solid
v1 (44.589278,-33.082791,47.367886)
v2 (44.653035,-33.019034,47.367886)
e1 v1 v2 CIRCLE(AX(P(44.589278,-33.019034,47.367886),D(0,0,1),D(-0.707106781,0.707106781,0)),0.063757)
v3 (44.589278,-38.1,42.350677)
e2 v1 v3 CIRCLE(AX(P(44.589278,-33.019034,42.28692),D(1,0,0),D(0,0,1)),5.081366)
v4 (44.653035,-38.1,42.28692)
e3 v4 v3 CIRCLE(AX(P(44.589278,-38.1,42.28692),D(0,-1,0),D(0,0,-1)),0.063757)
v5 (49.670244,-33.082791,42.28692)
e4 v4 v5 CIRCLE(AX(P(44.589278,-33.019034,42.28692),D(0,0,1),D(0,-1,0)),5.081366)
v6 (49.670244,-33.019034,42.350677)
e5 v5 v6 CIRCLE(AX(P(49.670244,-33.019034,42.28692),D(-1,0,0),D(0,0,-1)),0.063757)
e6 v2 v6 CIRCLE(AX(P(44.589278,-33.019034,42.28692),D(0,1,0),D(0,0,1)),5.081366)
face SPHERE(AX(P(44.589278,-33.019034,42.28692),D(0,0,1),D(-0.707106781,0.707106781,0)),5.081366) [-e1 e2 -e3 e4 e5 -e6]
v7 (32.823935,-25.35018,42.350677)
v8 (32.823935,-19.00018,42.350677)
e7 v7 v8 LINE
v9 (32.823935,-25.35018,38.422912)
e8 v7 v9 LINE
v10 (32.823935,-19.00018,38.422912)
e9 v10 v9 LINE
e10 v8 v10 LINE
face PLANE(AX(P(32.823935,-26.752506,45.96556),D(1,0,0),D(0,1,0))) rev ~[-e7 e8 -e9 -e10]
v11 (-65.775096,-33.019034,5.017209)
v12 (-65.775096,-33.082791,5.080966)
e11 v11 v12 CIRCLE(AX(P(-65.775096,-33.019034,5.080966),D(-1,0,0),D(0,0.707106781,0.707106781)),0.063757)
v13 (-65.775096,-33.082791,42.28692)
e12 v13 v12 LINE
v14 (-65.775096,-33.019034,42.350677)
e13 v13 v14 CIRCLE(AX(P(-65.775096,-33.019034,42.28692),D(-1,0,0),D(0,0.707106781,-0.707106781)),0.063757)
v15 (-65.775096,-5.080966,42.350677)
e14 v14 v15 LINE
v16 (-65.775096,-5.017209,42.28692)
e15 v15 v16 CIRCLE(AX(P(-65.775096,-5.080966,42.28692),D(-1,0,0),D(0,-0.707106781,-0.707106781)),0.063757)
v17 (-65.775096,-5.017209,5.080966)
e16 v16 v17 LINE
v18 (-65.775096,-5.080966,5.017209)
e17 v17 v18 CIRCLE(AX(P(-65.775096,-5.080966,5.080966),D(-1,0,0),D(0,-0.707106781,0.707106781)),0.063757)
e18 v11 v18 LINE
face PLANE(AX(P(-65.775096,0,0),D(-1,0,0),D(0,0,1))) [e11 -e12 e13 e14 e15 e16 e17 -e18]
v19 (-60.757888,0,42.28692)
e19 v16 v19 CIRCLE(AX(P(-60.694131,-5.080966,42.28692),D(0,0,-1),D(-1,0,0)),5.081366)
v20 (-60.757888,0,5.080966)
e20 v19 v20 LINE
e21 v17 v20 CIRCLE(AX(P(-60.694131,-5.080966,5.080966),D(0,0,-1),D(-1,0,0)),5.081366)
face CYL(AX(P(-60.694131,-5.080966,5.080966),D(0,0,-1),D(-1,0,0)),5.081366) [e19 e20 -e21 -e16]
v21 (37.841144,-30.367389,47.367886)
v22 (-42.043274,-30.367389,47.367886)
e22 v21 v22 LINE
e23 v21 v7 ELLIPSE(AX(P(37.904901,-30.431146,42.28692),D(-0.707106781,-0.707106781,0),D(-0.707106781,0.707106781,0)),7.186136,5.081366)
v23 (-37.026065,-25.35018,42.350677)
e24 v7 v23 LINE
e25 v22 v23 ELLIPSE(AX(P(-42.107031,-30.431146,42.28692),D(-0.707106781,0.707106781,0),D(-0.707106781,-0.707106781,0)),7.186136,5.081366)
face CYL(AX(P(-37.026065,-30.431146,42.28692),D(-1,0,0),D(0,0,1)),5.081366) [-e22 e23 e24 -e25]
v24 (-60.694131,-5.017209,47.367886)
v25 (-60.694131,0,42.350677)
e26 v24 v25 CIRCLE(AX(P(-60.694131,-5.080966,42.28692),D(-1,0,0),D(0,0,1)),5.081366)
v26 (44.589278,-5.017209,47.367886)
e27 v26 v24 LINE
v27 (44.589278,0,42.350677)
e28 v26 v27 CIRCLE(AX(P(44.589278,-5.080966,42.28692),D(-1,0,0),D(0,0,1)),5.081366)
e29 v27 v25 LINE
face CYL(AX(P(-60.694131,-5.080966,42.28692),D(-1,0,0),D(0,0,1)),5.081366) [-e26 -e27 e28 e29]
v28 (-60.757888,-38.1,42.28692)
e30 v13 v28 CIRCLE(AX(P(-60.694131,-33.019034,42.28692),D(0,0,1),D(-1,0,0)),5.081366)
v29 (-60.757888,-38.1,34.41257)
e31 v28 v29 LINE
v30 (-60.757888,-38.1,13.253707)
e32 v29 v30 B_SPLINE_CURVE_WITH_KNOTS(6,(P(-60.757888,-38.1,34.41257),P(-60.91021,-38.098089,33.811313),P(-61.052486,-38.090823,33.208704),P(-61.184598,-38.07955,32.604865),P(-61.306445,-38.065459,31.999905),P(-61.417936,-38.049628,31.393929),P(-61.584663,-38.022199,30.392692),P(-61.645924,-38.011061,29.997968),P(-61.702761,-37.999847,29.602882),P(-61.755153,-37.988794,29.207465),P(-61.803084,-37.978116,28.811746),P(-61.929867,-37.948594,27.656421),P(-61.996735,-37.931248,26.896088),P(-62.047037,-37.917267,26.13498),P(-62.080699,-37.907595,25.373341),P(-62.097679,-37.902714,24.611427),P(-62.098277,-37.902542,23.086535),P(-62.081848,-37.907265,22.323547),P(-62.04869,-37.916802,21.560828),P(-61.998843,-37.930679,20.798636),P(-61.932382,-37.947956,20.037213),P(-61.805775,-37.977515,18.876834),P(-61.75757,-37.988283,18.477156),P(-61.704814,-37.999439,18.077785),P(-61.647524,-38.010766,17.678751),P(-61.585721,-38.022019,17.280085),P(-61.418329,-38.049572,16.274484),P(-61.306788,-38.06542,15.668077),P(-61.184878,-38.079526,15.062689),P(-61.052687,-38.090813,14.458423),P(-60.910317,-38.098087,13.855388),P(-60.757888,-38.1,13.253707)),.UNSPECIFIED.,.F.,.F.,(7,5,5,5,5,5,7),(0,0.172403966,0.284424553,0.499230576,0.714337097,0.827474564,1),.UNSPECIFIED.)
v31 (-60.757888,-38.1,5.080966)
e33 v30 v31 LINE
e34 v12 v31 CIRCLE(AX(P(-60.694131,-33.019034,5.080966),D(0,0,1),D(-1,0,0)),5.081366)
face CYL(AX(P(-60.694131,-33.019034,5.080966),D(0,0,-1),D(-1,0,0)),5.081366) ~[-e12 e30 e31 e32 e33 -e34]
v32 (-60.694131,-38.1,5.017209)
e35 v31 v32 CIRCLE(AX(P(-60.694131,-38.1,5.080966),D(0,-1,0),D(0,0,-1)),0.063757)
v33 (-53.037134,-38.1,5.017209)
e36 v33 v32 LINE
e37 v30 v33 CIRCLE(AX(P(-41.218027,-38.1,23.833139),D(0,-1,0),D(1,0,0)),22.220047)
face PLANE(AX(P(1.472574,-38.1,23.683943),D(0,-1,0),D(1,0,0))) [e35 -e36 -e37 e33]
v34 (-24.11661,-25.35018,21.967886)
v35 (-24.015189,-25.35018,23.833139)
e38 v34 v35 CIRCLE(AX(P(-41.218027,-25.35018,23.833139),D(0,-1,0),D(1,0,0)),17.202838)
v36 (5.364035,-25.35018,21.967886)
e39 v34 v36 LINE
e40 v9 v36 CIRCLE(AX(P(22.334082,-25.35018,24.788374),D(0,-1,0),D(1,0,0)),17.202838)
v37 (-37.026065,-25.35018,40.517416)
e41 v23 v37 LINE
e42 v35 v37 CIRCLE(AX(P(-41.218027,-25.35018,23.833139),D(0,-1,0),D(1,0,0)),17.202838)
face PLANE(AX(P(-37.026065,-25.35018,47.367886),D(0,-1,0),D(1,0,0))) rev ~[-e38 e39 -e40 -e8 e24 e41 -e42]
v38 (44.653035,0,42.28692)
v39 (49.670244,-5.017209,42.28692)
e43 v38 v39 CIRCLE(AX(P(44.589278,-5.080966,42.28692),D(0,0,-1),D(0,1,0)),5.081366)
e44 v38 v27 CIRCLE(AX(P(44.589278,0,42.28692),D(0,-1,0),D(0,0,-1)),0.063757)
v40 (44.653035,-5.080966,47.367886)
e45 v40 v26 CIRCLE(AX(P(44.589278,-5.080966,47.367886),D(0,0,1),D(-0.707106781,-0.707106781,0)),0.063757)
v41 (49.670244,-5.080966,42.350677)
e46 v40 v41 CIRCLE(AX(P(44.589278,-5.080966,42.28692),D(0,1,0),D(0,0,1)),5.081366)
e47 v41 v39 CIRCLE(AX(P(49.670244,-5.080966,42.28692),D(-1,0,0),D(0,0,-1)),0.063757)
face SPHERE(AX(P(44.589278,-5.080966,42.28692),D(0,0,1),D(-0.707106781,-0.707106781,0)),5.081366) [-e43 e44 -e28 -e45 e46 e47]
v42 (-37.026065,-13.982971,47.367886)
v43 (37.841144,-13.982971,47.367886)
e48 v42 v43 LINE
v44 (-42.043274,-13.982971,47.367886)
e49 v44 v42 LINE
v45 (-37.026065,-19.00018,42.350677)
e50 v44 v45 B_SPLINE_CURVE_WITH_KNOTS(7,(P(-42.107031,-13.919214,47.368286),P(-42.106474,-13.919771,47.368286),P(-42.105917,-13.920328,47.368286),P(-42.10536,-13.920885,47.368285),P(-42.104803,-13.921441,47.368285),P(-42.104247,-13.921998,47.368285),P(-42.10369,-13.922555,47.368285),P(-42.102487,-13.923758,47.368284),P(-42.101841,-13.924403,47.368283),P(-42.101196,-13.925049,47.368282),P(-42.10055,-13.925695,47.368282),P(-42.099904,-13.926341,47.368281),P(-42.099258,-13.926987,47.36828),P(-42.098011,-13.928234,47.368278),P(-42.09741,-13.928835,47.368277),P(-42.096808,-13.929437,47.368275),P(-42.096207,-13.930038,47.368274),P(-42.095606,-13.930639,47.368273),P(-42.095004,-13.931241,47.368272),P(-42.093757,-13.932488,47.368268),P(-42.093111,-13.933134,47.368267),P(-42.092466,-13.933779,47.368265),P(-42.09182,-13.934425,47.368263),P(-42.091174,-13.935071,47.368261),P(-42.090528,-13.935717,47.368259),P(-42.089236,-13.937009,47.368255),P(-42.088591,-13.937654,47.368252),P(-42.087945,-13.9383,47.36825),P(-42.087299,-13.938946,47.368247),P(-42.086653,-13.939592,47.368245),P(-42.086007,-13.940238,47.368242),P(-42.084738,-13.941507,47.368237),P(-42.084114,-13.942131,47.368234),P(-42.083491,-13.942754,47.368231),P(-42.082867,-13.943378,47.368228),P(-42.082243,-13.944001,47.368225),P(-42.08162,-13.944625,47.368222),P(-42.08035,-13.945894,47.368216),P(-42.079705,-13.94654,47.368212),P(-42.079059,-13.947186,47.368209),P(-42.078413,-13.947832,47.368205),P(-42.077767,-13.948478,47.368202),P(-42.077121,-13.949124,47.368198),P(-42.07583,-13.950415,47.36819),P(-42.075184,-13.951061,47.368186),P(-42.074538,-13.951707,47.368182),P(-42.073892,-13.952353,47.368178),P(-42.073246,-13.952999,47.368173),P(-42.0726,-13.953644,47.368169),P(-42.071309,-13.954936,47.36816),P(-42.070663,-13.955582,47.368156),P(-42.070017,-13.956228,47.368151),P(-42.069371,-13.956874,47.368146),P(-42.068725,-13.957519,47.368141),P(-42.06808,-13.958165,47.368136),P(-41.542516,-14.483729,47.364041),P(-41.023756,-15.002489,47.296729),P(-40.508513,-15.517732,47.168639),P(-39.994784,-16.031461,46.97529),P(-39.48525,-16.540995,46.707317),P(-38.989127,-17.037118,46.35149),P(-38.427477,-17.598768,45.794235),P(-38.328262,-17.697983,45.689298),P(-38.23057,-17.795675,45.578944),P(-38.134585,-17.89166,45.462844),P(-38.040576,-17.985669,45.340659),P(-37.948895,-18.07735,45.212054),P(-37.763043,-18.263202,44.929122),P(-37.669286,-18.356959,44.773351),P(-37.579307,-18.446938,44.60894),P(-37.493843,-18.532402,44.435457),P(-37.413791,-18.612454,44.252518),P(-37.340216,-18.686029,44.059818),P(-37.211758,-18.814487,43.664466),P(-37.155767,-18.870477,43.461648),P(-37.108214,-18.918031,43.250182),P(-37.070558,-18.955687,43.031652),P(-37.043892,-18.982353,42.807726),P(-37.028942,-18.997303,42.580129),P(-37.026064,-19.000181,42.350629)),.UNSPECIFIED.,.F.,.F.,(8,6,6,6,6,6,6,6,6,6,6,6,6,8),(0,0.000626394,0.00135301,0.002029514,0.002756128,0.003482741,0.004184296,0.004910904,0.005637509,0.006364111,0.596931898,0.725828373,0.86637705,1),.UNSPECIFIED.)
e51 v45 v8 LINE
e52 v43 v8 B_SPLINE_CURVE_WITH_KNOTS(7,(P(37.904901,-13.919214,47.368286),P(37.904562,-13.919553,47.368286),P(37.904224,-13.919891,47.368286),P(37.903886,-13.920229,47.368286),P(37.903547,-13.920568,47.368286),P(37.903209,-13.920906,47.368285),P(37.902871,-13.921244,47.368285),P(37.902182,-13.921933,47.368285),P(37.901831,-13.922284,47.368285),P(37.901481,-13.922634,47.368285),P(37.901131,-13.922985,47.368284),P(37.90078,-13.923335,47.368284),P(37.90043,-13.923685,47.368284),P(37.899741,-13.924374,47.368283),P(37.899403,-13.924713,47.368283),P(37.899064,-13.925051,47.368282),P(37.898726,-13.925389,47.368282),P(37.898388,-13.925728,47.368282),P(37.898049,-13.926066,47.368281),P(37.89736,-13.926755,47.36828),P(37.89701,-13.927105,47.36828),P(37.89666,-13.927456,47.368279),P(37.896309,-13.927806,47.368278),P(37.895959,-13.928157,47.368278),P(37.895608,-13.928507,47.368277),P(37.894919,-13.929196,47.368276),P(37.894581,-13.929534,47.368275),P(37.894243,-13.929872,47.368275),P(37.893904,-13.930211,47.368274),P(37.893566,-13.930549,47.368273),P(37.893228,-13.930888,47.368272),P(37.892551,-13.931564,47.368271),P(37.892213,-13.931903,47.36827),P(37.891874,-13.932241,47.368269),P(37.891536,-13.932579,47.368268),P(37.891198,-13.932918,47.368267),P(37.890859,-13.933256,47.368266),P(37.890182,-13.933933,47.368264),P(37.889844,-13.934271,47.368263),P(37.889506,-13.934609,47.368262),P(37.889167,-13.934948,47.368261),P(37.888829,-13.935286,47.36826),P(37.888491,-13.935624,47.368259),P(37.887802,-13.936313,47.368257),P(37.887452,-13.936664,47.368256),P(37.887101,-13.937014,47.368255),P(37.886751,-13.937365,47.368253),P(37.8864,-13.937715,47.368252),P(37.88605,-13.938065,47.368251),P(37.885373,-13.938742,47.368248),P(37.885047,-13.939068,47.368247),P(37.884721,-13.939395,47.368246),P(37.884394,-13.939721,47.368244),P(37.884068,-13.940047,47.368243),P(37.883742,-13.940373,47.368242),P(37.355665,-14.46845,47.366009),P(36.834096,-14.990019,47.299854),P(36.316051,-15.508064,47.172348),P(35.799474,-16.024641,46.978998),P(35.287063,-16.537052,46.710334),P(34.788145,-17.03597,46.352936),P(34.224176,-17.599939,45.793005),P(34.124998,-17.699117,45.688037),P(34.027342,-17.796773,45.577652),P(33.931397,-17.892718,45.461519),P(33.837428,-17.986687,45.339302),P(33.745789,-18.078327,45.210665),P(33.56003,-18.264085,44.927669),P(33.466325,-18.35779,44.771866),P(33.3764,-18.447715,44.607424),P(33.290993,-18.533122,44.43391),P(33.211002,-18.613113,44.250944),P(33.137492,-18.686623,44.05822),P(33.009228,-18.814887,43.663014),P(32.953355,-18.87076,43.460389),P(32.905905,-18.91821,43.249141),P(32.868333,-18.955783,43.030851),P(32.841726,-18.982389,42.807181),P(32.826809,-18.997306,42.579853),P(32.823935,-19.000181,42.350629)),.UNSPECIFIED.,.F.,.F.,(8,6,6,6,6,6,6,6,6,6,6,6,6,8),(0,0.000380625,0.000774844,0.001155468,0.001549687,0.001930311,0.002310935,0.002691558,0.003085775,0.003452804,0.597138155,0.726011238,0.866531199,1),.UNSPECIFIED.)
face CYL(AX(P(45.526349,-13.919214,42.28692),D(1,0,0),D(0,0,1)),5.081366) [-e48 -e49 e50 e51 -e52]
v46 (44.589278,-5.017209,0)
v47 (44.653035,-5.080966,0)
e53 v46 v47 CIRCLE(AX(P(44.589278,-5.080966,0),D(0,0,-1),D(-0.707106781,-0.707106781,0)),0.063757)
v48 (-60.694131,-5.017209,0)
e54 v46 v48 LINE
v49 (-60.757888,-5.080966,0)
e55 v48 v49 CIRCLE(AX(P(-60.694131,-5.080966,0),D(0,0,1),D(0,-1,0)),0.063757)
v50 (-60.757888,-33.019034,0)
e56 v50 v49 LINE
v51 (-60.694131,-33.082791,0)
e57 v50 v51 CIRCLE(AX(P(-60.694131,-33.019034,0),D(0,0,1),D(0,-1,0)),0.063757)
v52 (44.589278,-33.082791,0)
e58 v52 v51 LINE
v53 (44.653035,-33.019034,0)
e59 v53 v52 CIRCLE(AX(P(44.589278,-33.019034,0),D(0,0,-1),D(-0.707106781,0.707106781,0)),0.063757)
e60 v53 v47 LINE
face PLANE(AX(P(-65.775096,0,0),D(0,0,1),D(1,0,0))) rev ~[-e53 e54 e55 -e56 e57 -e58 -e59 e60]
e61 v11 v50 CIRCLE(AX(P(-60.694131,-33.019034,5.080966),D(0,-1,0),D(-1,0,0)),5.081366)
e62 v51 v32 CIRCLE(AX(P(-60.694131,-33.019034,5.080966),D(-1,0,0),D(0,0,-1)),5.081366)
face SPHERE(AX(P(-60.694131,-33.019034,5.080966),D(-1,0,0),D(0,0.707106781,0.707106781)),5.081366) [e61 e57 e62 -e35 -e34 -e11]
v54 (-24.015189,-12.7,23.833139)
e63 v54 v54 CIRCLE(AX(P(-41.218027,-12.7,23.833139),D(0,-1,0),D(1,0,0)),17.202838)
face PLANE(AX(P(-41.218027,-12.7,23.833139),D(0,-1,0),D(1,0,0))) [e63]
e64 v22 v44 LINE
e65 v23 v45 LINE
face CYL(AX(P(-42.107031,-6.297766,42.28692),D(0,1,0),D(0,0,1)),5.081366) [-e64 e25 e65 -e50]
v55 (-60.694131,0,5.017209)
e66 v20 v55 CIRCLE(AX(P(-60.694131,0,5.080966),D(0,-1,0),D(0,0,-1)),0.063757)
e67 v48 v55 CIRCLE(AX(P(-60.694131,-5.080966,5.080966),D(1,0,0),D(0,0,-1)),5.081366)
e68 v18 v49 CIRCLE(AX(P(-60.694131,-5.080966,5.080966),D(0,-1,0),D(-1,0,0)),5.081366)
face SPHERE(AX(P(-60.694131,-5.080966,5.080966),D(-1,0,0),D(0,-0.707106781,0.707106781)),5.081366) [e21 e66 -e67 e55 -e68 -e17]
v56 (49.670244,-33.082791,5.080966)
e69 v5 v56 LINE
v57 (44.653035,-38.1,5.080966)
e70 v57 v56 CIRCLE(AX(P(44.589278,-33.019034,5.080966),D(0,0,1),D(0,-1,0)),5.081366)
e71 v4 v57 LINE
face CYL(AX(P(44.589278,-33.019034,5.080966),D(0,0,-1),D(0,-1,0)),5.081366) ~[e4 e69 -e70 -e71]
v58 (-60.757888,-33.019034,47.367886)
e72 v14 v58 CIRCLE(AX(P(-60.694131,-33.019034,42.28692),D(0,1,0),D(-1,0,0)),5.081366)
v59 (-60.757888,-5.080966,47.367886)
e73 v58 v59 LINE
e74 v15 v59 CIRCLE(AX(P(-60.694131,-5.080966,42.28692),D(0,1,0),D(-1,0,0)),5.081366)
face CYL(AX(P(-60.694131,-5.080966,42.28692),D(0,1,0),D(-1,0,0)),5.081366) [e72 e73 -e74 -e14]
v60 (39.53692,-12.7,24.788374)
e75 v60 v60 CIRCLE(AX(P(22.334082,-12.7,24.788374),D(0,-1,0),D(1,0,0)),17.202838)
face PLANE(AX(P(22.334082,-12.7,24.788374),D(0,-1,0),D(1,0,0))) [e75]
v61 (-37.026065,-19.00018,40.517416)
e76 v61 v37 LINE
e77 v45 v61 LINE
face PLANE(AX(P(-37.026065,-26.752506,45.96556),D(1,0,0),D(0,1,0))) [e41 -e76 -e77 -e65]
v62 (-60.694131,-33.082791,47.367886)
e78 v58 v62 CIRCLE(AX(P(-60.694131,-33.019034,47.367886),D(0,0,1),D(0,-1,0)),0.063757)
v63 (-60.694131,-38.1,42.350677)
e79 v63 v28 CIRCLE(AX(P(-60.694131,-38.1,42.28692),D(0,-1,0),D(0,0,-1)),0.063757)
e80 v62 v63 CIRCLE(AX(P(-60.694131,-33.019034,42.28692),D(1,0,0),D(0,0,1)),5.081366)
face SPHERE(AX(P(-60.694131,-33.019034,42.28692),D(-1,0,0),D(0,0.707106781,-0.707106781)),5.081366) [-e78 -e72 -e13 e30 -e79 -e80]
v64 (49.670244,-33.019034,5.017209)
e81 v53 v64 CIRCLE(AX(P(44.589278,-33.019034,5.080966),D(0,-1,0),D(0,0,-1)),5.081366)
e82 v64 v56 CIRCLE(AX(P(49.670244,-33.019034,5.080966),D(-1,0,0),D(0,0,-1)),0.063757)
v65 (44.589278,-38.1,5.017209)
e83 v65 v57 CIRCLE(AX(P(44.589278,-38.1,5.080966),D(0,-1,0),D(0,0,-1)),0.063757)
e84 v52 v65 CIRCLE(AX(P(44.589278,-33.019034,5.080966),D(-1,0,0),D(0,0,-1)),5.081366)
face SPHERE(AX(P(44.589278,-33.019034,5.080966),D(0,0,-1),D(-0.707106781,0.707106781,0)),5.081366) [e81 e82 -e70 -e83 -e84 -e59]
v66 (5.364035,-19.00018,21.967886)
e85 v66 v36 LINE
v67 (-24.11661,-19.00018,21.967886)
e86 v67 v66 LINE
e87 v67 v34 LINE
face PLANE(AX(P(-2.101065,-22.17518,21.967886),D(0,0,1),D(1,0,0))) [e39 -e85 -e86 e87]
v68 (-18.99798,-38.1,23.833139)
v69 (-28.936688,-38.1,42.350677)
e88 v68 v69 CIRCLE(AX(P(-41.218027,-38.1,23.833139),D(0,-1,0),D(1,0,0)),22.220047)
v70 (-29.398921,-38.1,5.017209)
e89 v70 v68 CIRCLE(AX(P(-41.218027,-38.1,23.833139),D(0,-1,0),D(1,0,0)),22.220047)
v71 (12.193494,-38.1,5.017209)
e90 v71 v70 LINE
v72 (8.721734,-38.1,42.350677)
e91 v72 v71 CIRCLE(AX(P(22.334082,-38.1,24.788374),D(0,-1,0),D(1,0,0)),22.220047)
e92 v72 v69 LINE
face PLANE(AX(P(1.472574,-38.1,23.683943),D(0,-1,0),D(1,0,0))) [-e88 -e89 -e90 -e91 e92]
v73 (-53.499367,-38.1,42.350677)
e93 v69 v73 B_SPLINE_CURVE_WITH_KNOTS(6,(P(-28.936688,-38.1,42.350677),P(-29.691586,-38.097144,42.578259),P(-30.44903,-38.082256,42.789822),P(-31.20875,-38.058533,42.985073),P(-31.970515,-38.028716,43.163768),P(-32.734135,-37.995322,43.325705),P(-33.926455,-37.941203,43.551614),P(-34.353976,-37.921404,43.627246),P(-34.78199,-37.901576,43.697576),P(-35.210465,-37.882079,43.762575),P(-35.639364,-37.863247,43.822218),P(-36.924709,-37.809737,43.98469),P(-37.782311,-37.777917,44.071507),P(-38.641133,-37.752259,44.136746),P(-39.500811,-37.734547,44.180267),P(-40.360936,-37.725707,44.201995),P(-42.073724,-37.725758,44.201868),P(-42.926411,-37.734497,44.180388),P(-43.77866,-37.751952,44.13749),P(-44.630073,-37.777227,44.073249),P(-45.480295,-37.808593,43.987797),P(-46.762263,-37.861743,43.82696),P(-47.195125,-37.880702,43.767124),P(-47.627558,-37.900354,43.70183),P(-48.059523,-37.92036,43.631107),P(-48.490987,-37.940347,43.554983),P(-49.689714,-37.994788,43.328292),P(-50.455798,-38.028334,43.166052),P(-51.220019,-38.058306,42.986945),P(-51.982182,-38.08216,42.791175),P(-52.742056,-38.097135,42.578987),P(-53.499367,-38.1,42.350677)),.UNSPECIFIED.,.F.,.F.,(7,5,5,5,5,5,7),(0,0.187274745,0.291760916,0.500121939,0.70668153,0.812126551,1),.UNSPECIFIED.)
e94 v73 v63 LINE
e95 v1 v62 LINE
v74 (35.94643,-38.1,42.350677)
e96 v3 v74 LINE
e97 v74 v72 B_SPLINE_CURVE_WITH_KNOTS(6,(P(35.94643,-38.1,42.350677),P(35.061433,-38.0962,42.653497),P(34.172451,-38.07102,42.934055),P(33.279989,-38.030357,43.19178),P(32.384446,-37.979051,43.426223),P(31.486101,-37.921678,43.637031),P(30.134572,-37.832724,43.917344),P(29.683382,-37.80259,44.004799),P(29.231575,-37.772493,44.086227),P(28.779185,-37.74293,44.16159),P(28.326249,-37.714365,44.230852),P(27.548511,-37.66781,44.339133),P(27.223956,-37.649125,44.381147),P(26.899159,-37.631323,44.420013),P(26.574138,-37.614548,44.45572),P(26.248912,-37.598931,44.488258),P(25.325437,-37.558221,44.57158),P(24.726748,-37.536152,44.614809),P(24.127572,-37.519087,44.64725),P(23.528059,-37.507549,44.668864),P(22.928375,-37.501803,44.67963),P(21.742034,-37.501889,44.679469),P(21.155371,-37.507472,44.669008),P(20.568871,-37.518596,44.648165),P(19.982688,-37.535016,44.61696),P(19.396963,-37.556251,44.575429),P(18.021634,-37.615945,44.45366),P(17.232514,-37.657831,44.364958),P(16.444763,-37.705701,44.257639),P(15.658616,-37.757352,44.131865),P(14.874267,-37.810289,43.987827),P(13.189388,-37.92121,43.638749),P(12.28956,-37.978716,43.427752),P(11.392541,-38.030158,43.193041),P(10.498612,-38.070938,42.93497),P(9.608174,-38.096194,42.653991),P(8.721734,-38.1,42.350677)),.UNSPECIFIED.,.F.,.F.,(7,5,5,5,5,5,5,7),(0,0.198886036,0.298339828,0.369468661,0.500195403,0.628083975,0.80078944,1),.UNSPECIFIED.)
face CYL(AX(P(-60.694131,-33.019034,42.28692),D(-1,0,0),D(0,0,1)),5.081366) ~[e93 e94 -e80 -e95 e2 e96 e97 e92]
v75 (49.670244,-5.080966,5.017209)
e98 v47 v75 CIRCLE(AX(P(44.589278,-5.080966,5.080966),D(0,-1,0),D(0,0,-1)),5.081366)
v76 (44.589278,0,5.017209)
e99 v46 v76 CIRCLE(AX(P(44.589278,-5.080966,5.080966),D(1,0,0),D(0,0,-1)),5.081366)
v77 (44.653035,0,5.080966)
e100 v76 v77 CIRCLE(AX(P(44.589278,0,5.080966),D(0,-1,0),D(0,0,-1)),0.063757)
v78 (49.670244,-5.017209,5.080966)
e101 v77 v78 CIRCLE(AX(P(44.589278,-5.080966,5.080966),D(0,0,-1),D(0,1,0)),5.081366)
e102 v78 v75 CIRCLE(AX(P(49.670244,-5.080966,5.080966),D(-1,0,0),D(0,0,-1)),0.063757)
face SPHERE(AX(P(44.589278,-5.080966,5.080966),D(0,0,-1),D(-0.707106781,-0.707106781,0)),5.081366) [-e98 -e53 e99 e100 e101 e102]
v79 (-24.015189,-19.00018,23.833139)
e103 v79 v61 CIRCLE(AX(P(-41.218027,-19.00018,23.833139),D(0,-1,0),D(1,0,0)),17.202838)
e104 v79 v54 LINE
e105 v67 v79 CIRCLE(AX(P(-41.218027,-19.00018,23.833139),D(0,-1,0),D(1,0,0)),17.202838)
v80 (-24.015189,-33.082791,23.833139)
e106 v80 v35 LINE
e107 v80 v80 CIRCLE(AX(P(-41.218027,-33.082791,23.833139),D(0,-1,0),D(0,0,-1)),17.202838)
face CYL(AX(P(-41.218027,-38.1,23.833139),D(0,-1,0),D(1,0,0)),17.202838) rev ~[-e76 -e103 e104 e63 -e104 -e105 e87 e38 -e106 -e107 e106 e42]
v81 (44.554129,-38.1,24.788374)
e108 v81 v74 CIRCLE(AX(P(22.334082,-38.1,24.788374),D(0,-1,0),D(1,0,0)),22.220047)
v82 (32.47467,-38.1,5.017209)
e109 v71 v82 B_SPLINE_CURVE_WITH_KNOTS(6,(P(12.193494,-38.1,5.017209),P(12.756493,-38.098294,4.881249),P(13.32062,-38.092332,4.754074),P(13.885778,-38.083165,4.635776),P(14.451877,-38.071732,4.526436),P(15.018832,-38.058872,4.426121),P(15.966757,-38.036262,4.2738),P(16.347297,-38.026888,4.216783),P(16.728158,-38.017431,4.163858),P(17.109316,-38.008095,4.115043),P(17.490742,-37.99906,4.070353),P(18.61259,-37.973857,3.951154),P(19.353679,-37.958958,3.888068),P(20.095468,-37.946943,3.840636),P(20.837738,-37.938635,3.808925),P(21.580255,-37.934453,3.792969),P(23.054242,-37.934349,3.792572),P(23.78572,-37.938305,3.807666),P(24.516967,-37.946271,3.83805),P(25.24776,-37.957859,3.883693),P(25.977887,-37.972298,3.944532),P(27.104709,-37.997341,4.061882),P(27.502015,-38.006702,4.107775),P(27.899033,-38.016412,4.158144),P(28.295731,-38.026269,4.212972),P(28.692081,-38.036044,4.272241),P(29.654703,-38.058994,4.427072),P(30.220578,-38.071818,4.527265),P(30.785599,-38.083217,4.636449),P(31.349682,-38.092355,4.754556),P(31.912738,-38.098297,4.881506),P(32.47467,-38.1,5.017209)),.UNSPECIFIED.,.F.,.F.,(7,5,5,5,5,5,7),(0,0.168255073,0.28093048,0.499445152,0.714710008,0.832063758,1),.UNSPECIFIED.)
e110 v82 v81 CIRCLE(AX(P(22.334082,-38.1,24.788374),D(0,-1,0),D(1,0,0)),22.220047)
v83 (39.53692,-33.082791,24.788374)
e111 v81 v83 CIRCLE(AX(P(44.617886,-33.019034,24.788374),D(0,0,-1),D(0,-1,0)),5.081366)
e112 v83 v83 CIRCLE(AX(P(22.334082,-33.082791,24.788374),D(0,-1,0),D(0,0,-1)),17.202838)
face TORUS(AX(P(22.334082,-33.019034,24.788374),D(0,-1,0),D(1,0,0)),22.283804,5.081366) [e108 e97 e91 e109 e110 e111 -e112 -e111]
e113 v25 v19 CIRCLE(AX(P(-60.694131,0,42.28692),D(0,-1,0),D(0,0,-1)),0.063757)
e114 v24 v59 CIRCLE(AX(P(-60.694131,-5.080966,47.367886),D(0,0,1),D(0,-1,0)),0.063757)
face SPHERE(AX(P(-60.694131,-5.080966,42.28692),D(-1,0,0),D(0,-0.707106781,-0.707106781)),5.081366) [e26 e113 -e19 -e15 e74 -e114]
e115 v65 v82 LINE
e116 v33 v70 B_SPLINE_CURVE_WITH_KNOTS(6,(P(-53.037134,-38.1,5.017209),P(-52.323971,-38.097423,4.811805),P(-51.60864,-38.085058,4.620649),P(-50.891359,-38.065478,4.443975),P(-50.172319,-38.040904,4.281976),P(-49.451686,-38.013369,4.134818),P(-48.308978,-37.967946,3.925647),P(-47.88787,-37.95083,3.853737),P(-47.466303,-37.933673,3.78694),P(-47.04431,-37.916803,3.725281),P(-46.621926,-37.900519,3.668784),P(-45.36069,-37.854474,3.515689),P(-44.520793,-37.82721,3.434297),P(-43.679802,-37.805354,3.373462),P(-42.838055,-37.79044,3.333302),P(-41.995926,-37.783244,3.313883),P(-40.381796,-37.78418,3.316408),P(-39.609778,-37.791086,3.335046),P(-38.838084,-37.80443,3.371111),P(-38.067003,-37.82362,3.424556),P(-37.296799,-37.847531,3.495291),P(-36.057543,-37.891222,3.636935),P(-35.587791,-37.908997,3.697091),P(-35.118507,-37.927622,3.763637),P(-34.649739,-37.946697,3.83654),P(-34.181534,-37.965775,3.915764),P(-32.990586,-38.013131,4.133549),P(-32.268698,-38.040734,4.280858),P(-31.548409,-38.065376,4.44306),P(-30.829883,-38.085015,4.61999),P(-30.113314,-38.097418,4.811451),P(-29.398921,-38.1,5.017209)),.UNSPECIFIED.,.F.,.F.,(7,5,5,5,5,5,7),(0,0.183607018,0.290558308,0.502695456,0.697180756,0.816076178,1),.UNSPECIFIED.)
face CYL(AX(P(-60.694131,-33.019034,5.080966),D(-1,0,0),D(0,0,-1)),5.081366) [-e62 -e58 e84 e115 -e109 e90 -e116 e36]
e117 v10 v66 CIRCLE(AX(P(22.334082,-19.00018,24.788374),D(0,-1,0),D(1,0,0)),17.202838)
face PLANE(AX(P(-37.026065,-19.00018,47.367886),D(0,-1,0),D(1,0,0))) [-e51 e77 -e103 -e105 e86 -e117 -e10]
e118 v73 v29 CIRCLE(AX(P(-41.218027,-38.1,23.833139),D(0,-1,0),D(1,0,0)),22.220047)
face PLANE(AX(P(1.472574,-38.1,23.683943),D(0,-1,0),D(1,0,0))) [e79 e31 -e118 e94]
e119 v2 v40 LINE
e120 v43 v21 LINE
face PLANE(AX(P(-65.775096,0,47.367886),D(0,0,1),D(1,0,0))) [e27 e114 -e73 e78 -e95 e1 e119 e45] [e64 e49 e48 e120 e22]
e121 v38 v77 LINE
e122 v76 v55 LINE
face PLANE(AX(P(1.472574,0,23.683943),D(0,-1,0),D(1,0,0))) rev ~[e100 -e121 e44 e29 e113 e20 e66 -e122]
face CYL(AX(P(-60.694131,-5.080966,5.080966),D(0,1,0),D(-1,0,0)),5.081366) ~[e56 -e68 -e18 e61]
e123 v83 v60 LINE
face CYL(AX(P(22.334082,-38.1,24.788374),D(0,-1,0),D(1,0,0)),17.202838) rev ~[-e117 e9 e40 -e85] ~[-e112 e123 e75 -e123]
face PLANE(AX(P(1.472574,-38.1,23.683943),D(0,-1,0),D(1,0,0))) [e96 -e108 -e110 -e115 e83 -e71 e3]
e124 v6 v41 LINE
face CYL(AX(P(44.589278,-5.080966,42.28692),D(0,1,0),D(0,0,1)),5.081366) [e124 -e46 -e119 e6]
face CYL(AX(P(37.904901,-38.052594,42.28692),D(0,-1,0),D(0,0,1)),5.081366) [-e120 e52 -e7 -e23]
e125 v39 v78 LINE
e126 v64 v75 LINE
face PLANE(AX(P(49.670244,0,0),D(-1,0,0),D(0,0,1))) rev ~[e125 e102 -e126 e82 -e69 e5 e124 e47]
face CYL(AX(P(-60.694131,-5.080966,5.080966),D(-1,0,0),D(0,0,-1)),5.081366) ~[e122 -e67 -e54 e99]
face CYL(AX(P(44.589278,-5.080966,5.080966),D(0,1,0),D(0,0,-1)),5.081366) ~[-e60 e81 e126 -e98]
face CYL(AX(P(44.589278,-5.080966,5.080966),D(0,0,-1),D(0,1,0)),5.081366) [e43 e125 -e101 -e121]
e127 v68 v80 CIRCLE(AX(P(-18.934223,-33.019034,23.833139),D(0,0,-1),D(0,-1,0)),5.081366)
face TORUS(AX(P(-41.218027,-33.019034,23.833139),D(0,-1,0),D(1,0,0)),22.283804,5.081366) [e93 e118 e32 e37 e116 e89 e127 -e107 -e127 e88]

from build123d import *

# Parameters (mm, degrees)
F0_W          = 134.4953402877
F0_H          = 47.3678857088
F1_DEPTH      = 38.1
F2_R          = 17.202838431
F3_DEPTH      = 25.4
F4_W          = 69.85
F4_H          = 6.35
F5_DEPTH      = 25.4
F6_DEPTH      = 19.05
F7_T1_DEPTH   = 105.2834089168
F7_T3_DEPTH   = 27.9380686292
F7_T5_DEPTH   = 37.205954338
F7_T7_DEPTH   = 69.85
F7_T9_DEPTH   = 6.35
F7_S13_W      = 5.589502254
F7_S13_H      = 5.5895022539
F7_T14_DEPTH  = 5.589502254
F7_S19_W      = 5.5895022539
F7_S19_H      = 5.589502254
F7_T20_DEPTH  = 5.589502254
F7_S25_W      = 5.589502254
F7_S25_H      = 5.5895022539
F7_T26_DEPTH  = 5.589502254
F7_S31_W      = 5.5895022539
F7_S31_H      = 5.589502254
F7_T32_DEPTH  = 5.589502254
F7_S37_W      = 5.589502254
F7_S37_H      = 5.5895022539
F7_T38_DEPTH  = 5.589502254
F7_S43_W      = 5.5895022539
F7_S43_H      = 5.5895022539
F7_T44_DEPTH  = 5.589502254
F7_S49_W      = 5.589502254
F7_S49_H      = 5.5895022539
F7_T50_DEPTH  = 5.589502254
F7_S55_W      = 5.5895022539
F7_S55_H      = 5.5895022539
F7_T56_DEPTH  = 5.589502254
F7_T67_DEPTH  = 82.5524142529
F7_T71_DEPTH  = 19.0524142529
F7_T78_DEPTH  = 82.5524142529
F7_T82_DEPTH  = 19.0524142529
F7_T89_DEPTH  = 19.0524142529
F7_T93_DEPTH  = 82.5524142529
F7_T100_DEPTH = 19.0524142529
F7_T104_DEPTH = 82.5524142529


# Not quite as in the source:
# - a fillet or chamfer that OpenCascade refuses, or shapes differently, is made with other operations: its cross-section is extruded or revolved along the edge and cut away or added


with BuildPart() as f1:
    # F0 (on Front) → F1 (new body)
    with BuildSketch(Plane.XZ):
        with Locations((1.4725737274, 23.6839428544)):
            Rectangle(F0_W, F0_H)
    extrude(amount=F1_DEPTH)

    # F2 (on face) → F3 (cut)
    with BuildSketch(Plane.XZ.offset(38.1)):
        with Locations((-41.2180274725, 23.8331388682)):
            Circle(F2_R)
        with Locations((22.3340820521, 24.7883740813)):
            Circle(F2_R)
    extrude(amount=-F3_DEPTH, mode=Mode.SUBTRACT)

    # F4 (on face) → F5 (cut)
    with BuildSketch(Plane.XY.offset(47.3678857088)):
        with Locations((-2.1010648489, -22.1751800656)):
            Rectangle(F4_W, F4_H)
    extrude(amount=-F5_DEPTH, mode=Mode.SUBTRACT)

    # F6 (cut): a face of the model
    f6_faces = [f1.faces().sort_by_distance(p)[0] for p in [
        (68.7202438712, -19.05, 23.6839428544),
    ]]
    extrude(f6_faces, amount=-F6_DEPTH, mode=Mode.SUBTRACT)

    # F7: fillet of radius 5.08 on 18 edges, made by hand

    # F7_s2 → F7_t1 (cut)
    with BuildSketch(Plane.YZ.offset(-60.694130731)):
        with BuildLine():
            ThreePointArc((-33.0190343146, 47.3682857088), (-36.6121024484, 45.8799881572), (-38.1004, 42.2869200234))
            Line((-38.1004, 42.2869200234), (-38.6085365685, 42.2869200234))
            ThreePointArc((-38.6085365685, 42.2869200234), (-38.6081365685, 44.8274028661), (-38.6081365685, 47.3678857088))
            Line((-38.6081365685, 47.3678857088), (-38.1, 47.8760222774))
            ThreePointArc((-38.1, 47.8760222774), (-35.5595171573, 47.8760222774), (-33.0190343146, 47.8764222774))
            Line((-33.0190343146, 47.8764222774), (-33.0190343146, 47.3682857088))
        make_face()
        with BuildLine():
            ThreePointArc((-5.0809656854, 47.3682857088), (-1.4878975516, 45.8799881572), (0.0004, 42.2869200234))
            Line((0.0004, 42.2869200234), (0.5085365685, 42.2869200234))
            ThreePointArc((0.5085365685, 42.2869200234), (0.5081365685, 44.8274028661), (0.5081365685, 47.3678857088))
            Line((0.5081365685, 47.3678857088), (0, 47.8760222774))
            ThreePointArc((0, 47.8760222774), (-2.5404828427, 47.8760222774), (-5.0809656854, 47.8764222774))
            Line((-5.0809656854, 47.8764222774), (-5.0809656854, 47.3682857088))
        make_face()
        with BuildLine():
            ThreePointArc((-33.0190343146, -0.0004), (-36.6121024484, 1.4878975516), (-38.1004, 5.0809656854))
            Line((-38.1004, 5.0809656854), (-38.6085365685, 5.0809656854))
            ThreePointArc((-38.6085365685, 5.0809656854), (-38.6081365685, 2.5404828427), (-38.6081365685, 0))
            Line((-38.6081365685, 0), (-38.1, -0.5081365685))
            ThreePointArc((-38.1, -0.5081365685), (-35.5595171573, -0.5081365685), (-33.0190343146, -0.5085365685))
            Line((-33.0190343146, -0.5085365685), (-33.0190343146, -0.0004))
        make_face()
        with BuildLine():
            ThreePointArc((-5.0809656854, -0.0004), (-1.4878975516, 1.4878975516), (0.0004, 5.0809656854))
            Line((0.0004, 5.0809656854), (0.5085365685, 5.0809656854))
            ThreePointArc((0.5085365685, 5.0809656854), (0.5081365685, 2.5404828427), (0.5081365685, 0))
            Line((0.5081365685, 0), (0, -0.5081365685))
            ThreePointArc((0, -0.5081365685), (-2.5404828427, -0.5081365685), (-5.0809656854, -0.5085365685))
            Line((-5.0809656854, -0.5085365685), (-5.0809656854, -0.0004))
        make_face()
    extrude(amount=F7_T1_DEPTH, mode=Mode.SUBTRACT)

    # F7_s4 → F7_t3 (cut)
    with BuildSketch(Plane.XZ.offset(5.0809656854)):
        with BuildLine():
            ThreePointArc((44.5892781858, 47.3682857088), (48.1823463196, 45.8799881572), (49.6706438712, 42.2869200234))
            Line((49.6706438712, 42.2869200234), (50.1787804398, 42.2869200234))
            ThreePointArc((50.1787804398, 42.2869200234), (50.1783804398, 44.8274028661), (50.1783804398, 47.3678857088))
            Line((50.1783804398, 47.3678857088), (49.6702438712, 47.8760222774))
            ThreePointArc((49.6702438712, 47.8760222774), (47.1297610285, 47.8760222774), (44.5892781858, 47.8764222774))
            Line((44.5892781858, 47.8764222774), (44.5892781858, 47.3682857088))
        make_face()
        with BuildLine():
            ThreePointArc((-65.7754964165, 42.2869200234), (-64.2871988649, 45.8799881572), (-60.694130731, 47.3682857088))
            Line((-60.694130731, 47.3682857088), (-60.694130731, 47.8764222774))
            ThreePointArc((-60.694130731, 47.8764222774), (-63.2346135738, 47.8760222774), (-65.7750964165, 47.8760222774))
            Line((-65.7750964165, 47.8760222774), (-66.283232985, 47.3678857088))
            ThreePointArc((-66.283232985, 47.3678857088), (-66.283232985, 44.8274028661), (-66.283632985, 42.2869200234))
            Line((-66.283632985, 42.2869200234), (-65.7754964165, 42.2869200234))
        make_face()
        with BuildLine():
            ThreePointArc((44.5892781858, -0.0004), (48.1823463196, 1.4878975516), (49.6706438712, 5.0809656854))
            Line((49.6706438712, 5.0809656854), (50.1787804398, 5.0809656854))
            ThreePointArc((50.1787804398, 5.0809656854), (50.1783804398, 2.5404828427), (50.1783804398, 0))
            Line((50.1783804398, 0), (49.6702438712, -0.5081365685))
            ThreePointArc((49.6702438712, -0.5081365685), (47.1297610285, -0.5081365685), (44.5892781858, -0.5085365685))
            Line((44.5892781858, -0.5085365685), (44.5892781858, -0.0004))
        make_face()
        with BuildLine():
            ThreePointArc((-65.7754964165, 5.0809656854), (-64.2871988649, 1.4878975516), (-60.694130731, -0.0004))
            Line((-60.694130731, -0.0004), (-60.694130731, -0.5085365685))
            ThreePointArc((-60.694130731, -0.5085365685), (-63.2346135738, -0.5081365685), (-65.7750964165, -0.5081365685))
            Line((-65.7750964165, -0.5081365685), (-66.283232985, 0))
            ThreePointArc((-66.283232985, 0), (-66.283232985, 2.5404828427), (-66.283632985, 5.0809656854))
            Line((-66.283632985, 5.0809656854), (-65.7754964165, 5.0809656854))
        make_face()
    extrude(amount=F7_T3_DEPTH, mode=Mode.SUBTRACT)

    # F7_s6 → F7_t5 (cut)
    with BuildSketch(Plane.XY.offset(5.0809656854)):
        with BuildLine():
            ThreePointArc((44.5892781858, -38.1004), (48.1823463196, -36.6121024484), (49.6706438712, -33.0190343146))
            Line((49.6706438712, -33.0190343146), (50.1787804398, -33.0190343146))
            ThreePointArc((50.1787804398, -33.0190343146), (50.1783804398, -35.5595171573), (50.1783804398, -38.1))
            Line((50.1783804398, -38.1), (49.6702438712, -38.6081365685))
            ThreePointArc((49.6702438712, -38.6081365685), (47.1297610285, -38.6081365685), (44.5892781858, -38.6085365685))
            Line((44.5892781858, -38.6085365685), (44.5892781858, -38.1004))
        make_face()
        with BuildLine():
            ThreePointArc((-65.7754964165, -33.0190343146), (-64.2871988649, -36.6121024484), (-60.694130731, -38.1004))
            Line((-60.694130731, -38.1004), (-60.694130731, -38.6085365685))
            ThreePointArc((-60.694130731, -38.6085365685), (-63.2346135738, -38.6081365685), (-65.7750964165, -38.6081365685))
            Line((-65.7750964165, -38.6081365685), (-66.283232985, -38.1))
            ThreePointArc((-66.283232985, -38.1), (-66.283232985, -35.5595171573), (-66.283632985, -33.0190343146))
            Line((-66.283632985, -33.0190343146), (-65.7754964165, -33.0190343146))
        make_face()
        with BuildLine():
            ThreePointArc((44.5892781858, 0.0004), (48.1823463196, -1.4878975516), (49.6706438712, -5.0809656854))
            Line((49.6706438712, -5.0809656854), (50.1787804398, -5.0809656854))
            ThreePointArc((50.1787804398, -5.0809656854), (50.1783804398, -2.5404828427), (50.1783804398, 0))
            Line((50.1783804398, 0), (49.6702438712, 0.5081365685))
            ThreePointArc((49.6702438712, 0.5081365685), (47.1297610285, 0.5081365685), (44.5892781858, 0.5085365685))
            Line((44.5892781858, 0.5085365685), (44.5892781858, 0.0004))
        make_face()
        with BuildLine():
            ThreePointArc((-65.7754964165, -5.0809656854), (-64.2871988649, -1.4878975516), (-60.694130731, 0.0004))
            Line((-60.694130731, 0.0004), (-60.694130731, 0.5085365685))
            ThreePointArc((-60.694130731, 0.5085365685), (-63.2346135738, 0.5081365685), (-65.7750964165, 0.5081365685))
            Line((-65.7750964165, 0.5081365685), (-66.283232985, 0))
            ThreePointArc((-66.283232985, 0), (-66.283232985, -2.5404828427), (-66.283632985, -5.0809656854))
            Line((-66.283632985, -5.0809656854), (-65.7754964165, -5.0809656854))
        make_face()
    extrude(amount=F7_T5_DEPTH, mode=Mode.SUBTRACT)

    # F7_s8 → F7_t7 (cut)
    with BuildSketch(Plane.YZ.offset(-37.0260648489)):
        with BuildLine():
            ThreePointArc((-30.4311457511, 47.3682857088), (-26.8380776172, 45.8799881572), (-25.3497800656, 42.2869200234))
            Line((-25.3497800656, 42.2869200234), (-24.8416434971, 42.2869200234))
            ThreePointArc((-24.8416434971, 42.2869200234), (-24.8420434971, 44.8274028661), (-24.8420434971, 47.3678857088))
            Line((-24.8420434971, 47.3678857088), (-25.3501800656, 47.8760222774))
            ThreePointArc((-25.3501800656, 47.8760222774), (-27.8906629083, 47.8760222774), (-30.4311457511, 47.8764222774))
            Line((-30.4311457511, 47.8764222774), (-30.4311457511, 47.3682857088))
        make_face()
        with BuildLine():
            ThreePointArc((-13.9192143802, 47.3682857088), (-17.5122825141, 45.8799881572), (-19.0005800656, 42.2869200234))
            Line((-19.0005800656, 42.2869200234), (-19.5087166342, 42.2869200234))
            ThreePointArc((-19.5087166342, 42.2869200234), (-19.5083166342, 44.8274028661), (-19.5083166342, 47.3678857088))
            Line((-19.5083166342, 47.3678857088), (-19.0001800656, 47.8760222774))
            ThreePointArc((-19.0001800656, 47.8760222774), (-16.4596972229, 47.8760222774), (-13.9192143802, 47.8764222774))
            Line((-13.9192143802, 47.8764222774), (-13.9192143802, 47.3682857088))
        make_face()
    extrude(amount=F7_T7_DEPTH, mode=Mode.SUBTRACT)

    # F7_s10 → F7_t9 (cut)
    with BuildSketch(Plane.XZ.offset(19.0001800656)):
        with BuildLine():
            ThreePointArc((37.9049008365, 47.3682857088), (34.3118327027, 45.8799881572), (32.8235351511, 42.2869200234))
            Line((32.8235351511, 42.2869200234), (32.3153985826, 42.2869200234))
            ThreePointArc((32.3153985826, 42.2869200234), (32.3157985826, 44.8274028661), (32.3157985826, 47.3678857088))
            Line((32.3157985826, 47.3678857088), (32.8239351511, 47.8760222774))
            ThreePointArc((32.8239351511, 47.8760222774), (35.3644179938, 47.8760222774), (37.9049008365, 47.8764222774))
            Line((37.9049008365, 47.8764222774), (37.9049008365, 47.3682857088))
        make_face()
        with BuildLine():
            ThreePointArc((-42.1070305343, 47.3682857088), (-38.5139624005, 45.8799881572), (-37.0256648489, 42.2869200234))
            Line((-37.0256648489, 42.2869200234), (-36.5175282804, 42.2869200234))
            ThreePointArc((-36.5175282804, 42.2869200234), (-36.5179282804, 44.8274028661), (-36.5179282804, 47.3678857088))
            Line((-36.5179282804, 47.3678857088), (-37.0260648489, 47.8760222774))
            ThreePointArc((-37.0260648489, 47.8760222774), (-39.5665476916, 47.8760222774), (-42.1070305343, 47.8764222774))
            Line((-42.1070305343, 47.8764222774), (-42.1070305343, 47.3682857088))
        make_face()
    extrude(amount=F7_T9_DEPTH, mode=Mode.SUBTRACT)


with BuildPart() as f7_tool12:
    # F7_s13 → F7_t14 (new body)
    with BuildSketch(Plane.XY.offset(42.2869200234)):
        with Locations((47.3840293128, -35.8137854415)):
            Rectangle(F7_S13_W, F7_S13_H)
    extrude(amount=F7_T14_DEPTH)

    # F7_s15 → F7_t16 (revolve, cut)
    with BuildSketch(Plane(origin=(44.5892781858, -33.0190343146, 42.2869200234), x_dir=(-0.7071067812, 0.7071067812, 0), z_dir=(0.7071067812, 0.7071067812, 0))):
        with BuildLine():
            ThreePointArc((0, -5.0813656854), (5.0813656854, 0), (0, 5.0813656854))
            Line((0, 5.0813656854), (0, -5.0813656854))
        make_face()
    revolve(axis=Axis((44.5892781858, -33.0190343146, 42.2869200234), (0, 0, 1)), mode=Mode.SUBTRACT)


with BuildPart() as f1_1:
    add(f1.part)

    # F7_t11: cut F7_tool12
    add(f7_tool12.part, mode=Mode.SUBTRACT)


with BuildPart() as f7_tool18:
    # F7_s19 → F7_t20 (new body)
    with BuildSketch(Plane.YZ.offset(-60.694130731)):
        with Locations((-35.8137854415, 45.0816711504)):
            Rectangle(F7_S19_W, F7_S19_H)
    extrude(amount=-F7_T20_DEPTH)

    # F7_s21 → F7_t22 (revolve, cut)
    with BuildSketch(Plane(origin=(-60.694130731, -33.0190343146, 42.2869200234), x_dir=(0, 0.7071067812, -0.7071067812), z_dir=(0, 0.7071067812, 0.7071067812))):
        with BuildLine():
            ThreePointArc((0, -5.0813656854), (5.0813656854, 0), (0, 5.0813656854))
            Line((0, 5.0813656854), (0, -5.0813656854))
        make_face()
    revolve(axis=Axis((-60.694130731, -33.0190343146, 42.2869200234), (-1, 0, 0)), mode=Mode.SUBTRACT)


with BuildPart() as f1_2:
    add(f1_1.part)

    # F7_t17: cut F7_tool18
    add(f7_tool18.part, mode=Mode.SUBTRACT)


with BuildPart() as f7_tool24:
    # F7_s25 → F7_t26 (new body)
    with BuildSketch(Plane.XY.offset(42.2869200234)):
        with Locations((47.3840293128, -2.2862145584)):
            Rectangle(F7_S25_W, F7_S25_H)
    extrude(amount=F7_T26_DEPTH)

    # F7_s27 → F7_t28 (revolve, cut)
    with BuildSketch(Plane(origin=(44.5892781858, -5.0809656854, 42.2869200234), x_dir=(-0.7071067812, -0.7071067812, 0), z_dir=(-0.7071067812, 0.7071067812, 0))):
        with BuildLine():
            ThreePointArc((0, -5.0813656854), (5.0813656854, 0), (0, 5.0813656854))
            Line((0, 5.0813656854), (0, -5.0813656854))
        make_face()
    revolve(axis=Axis((44.5892781858, -5.0809656854, 42.2869200234), (0, 0, 1)), mode=Mode.SUBTRACT)


with BuildPart() as f1_3:
    add(f1_2.part)

    # F7_t23: cut F7_tool24
    add(f7_tool24.part, mode=Mode.SUBTRACT)


with BuildPart() as f7_tool30:
    # F7_s31 → F7_t32 (new body)
    with BuildSketch(Plane.YZ.offset(-60.694130731)):
        with Locations((-2.2862145584, 45.0816711504)):
            Rectangle(F7_S31_W, F7_S31_H)
    extrude(amount=-F7_T32_DEPTH)

    # F7_s33 → F7_t34 (revolve, cut)
    with BuildSketch(Plane(origin=(-60.694130731, -5.0809656854, 42.2869200234), x_dir=(0, -0.7071067812, -0.7071067812), z_dir=(0, 0.7071067812, -0.7071067812))):
        with BuildLine():
            ThreePointArc((0, -5.0813656854), (5.0813656854, 0), (0, 5.0813656854))
            Line((0, 5.0813656854), (0, -5.0813656854))
        make_face()
    revolve(axis=Axis((-60.694130731, -5.0809656854, 42.2869200234), (-1, 0, 0)), mode=Mode.SUBTRACT)


with BuildPart() as f1_4:
    add(f1_3.part)

    # F7_t29: cut F7_tool30
    add(f7_tool30.part, mode=Mode.SUBTRACT)


with BuildPart() as f7_tool36:
    # F7_s37 → F7_t38 (new body)
    with BuildSketch(Plane.XY.offset(5.0809656854)):
        with Locations((47.3840293128, -35.8137854415)):
            Rectangle(F7_S37_W, F7_S37_H)
    extrude(amount=-F7_T38_DEPTH)

    # F7_s39 → F7_t40 (revolve, cut)
    with BuildSketch(Plane(origin=(44.5892781858, -33.0190343146, 5.0809656854), x_dir=(-0.7071067812, 0.7071067812, 0), z_dir=(-0.7071067812, -0.7071067812, 0))):
        with BuildLine():
            ThreePointArc((0, -5.0813656854), (5.0813656854, 0), (0, 5.0813656854))
            Line((0, 5.0813656854), (0, -5.0813656854))
        make_face()
    revolve(axis=Axis((44.5892781858, -33.0190343146, 5.0809656854), (0, 0, -1)), mode=Mode.SUBTRACT)


with BuildPart() as f1_5:
    add(f1_4.part)

    # F7_t35: cut F7_tool36
    add(f7_tool36.part, mode=Mode.SUBTRACT)


with BuildPart() as f7_tool42:
    # F7_s43 → F7_t44 (new body)
    with BuildSketch(Plane.YZ.offset(-60.694130731)):
        with Locations((-35.8137854415, 2.2862145584)):
            Rectangle(F7_S43_W, F7_S43_H)
    extrude(amount=-F7_T44_DEPTH)

    # F7_s45 → F7_t46 (revolve, cut)
    with BuildSketch(Plane(origin=(-60.694130731, -33.0190343146, 5.0809656854), x_dir=(0, 0.7071067812, 0.7071067812), z_dir=(0, -0.7071067812, 0.7071067812))):
        with BuildLine():
            ThreePointArc((0, -5.0813656854), (5.0813656854, 0), (0, 5.0813656854))
            Line((0, 5.0813656854), (0, -5.0813656854))
        make_face()
    revolve(axis=Axis((-60.694130731, -33.0190343146, 5.0809656854), (-1, 0, 0)), mode=Mode.SUBTRACT)


with BuildPart() as f1_6:
    add(f1_5.part)

    # F7_t41: cut F7_tool42
    add(f7_tool42.part, mode=Mode.SUBTRACT)


with BuildPart() as f7_tool48:
    # F7_s49 → F7_t50 (new body)
    with BuildSketch(Plane.XY.offset(5.0809656854)):
        with Locations((47.3840293128, -2.2862145584)):
            Rectangle(F7_S49_W, F7_S49_H)
    extrude(amount=-F7_T50_DEPTH)

    # F7_s51 → F7_t52 (revolve, cut)
    with BuildSketch(Plane(origin=(44.5892781858, -5.0809656854, 5.0809656854), x_dir=(-0.7071067812, -0.7071067812, 0), z_dir=(0.7071067812, -0.7071067812, 0))):
        with BuildLine():
            ThreePointArc((0, -5.0813656854), (5.0813656854, 0), (0, 5.0813656854))
            Line((0, 5.0813656854), (0, -5.0813656854))
        make_face()
    revolve(axis=Axis((44.5892781858, -5.0809656854, 5.0809656854), (0, 0, -1)), mode=Mode.SUBTRACT)


with BuildPart() as f1_7:
    add(f1_6.part)

    # F7_t47: cut F7_tool48
    add(f7_tool48.part, mode=Mode.SUBTRACT)


with BuildPart() as f7_tool54:
    # F7_s55 → F7_t56 (new body)
    with BuildSketch(Plane.YZ.offset(-60.694130731)):
        with Locations((-2.2862145584, 2.2862145584)):
            Rectangle(F7_S55_W, F7_S55_H)
    extrude(amount=-F7_T56_DEPTH)

    # F7_s57 → F7_t58 (revolve, cut)
    with BuildSketch(Plane(origin=(-60.694130731, -5.0809656854, 5.0809656854), x_dir=(0, -0.7071067812, 0.7071067812), z_dir=(0, -0.7071067812, -0.7071067812))):
        with BuildLine():
            ThreePointArc((0, -5.0813656854), (5.0813656854, 0), (0, 5.0813656854))
            Line((0, 5.0813656854), (0, -5.0813656854))
        make_face()
    revolve(axis=Axis((-60.694130731, -5.0809656854, 5.0809656854), (-1, 0, 0)), mode=Mode.SUBTRACT)


with BuildPart() as f1_8:
    add(f1_7.part)

    # F7_t53: cut F7_tool54
    add(f7_tool54.part, mode=Mode.SUBTRACT)

    # F7_s59 → F7_t60 (revolve, cut)
    with BuildSketch(Plane.XY.offset(23.8331388682)):
        with BuildLine():
            ThreePointArc((-18.9342233561, -38.1004), (-22.52729149, -36.6121024484), (-24.0155890415, -33.0190343146))
            Line((-24.0155890415, -33.0190343146), (-24.5237256101, -33.0190343146))
            ThreePointArc((-24.5237256101, -33.0190343146), (-24.5233256101, -35.5595171573), (-24.5233256101, -38.1))
            Line((-24.5233256101, -38.1), (-24.0151890415, -38.6081365685))
            ThreePointArc((-24.0151890415, -38.6081365685), (-21.4747061988, -38.6081365685), (-18.9342233561, -38.6085365685))
            Line((-18.9342233561, -38.6085365685), (-18.9342233561, -38.1004))
        make_face()
    revolve(axis=Axis((-41.2180274725, -38.1, 23.8331388682), (0, -1, 0)), mode=Mode.SUBTRACT)

    # F7_s61 → F7_t62 (revolve, cut)
    with BuildSketch(Plane.XY.offset(24.7883740813)):
        with BuildLine():
            ThreePointArc((44.6178861685, -38.1004), (41.0248180346, -36.6121024484), (39.5365204831, -33.0190343146))
            Line((39.5365204831, -33.0190343146), (39.0283839145, -33.0190343146))
            ThreePointArc((39.0283839145, -33.0190343146), (39.0287839145, -35.5595171573), (39.0287839145, -38.1))
            Line((39.0287839145, -38.1), (39.5369204831, -38.6081365685))
            ThreePointArc((39.5369204831, -38.6081365685), (42.0774033258, -38.6081365685), (44.6178861685, -38.6085365685))
            Line((44.6178861685, -38.6085365685), (44.6178861685, -38.1004))
        make_face()
    revolve(axis=Axis((22.3340820521, -38.1, 24.7883740813), (0, -1, 0)), mode=Mode.SUBTRACT)


with BuildPart() as f7_tool65:
    # F7_s66 → F7_t67 (new body)
    with BuildSketch(Plane.YZ.offset(-49.7284791018)):
        with BuildLine():
            ThreePointArc((-30.4311457511, 47.3682857088), (-26.8380776172, 45.8799881572), (-25.3497800656, 42.2869200234))
            Line((-25.3497800656, 42.2869200234), (-24.8416434971, 42.2869200234))
            ThreePointArc((-24.8416434971, 42.2869200234), (-24.8420434971, 44.8274028661), (-24.8420434971, 47.3678857088))
            Line((-24.8420434971, 47.3678857088), (-25.3501800656, 47.8760222774))
            ThreePointArc((-25.3501800656, 47.8760222774), (-27.8906629083, 47.8760222774), (-30.4311457511, 47.8764222774))
            Line((-30.4311457511, 47.8764222774), (-30.4311457511, 47.3682857088))
        make_face()
    extrude(amount=F7_T67_DEPTH)

    split(bisect_by=Plane.YZ.offset(-37.0260648489), keep=Keep.BOTTOM)


with BuildPart() as f7_tool69:
    # F7_s70 → F7_t71 (new body)
    with BuildSketch(Plane.XZ.offset(19.0001800656)):
        with BuildLine():
            ThreePointArc((-42.1070305343, 47.3682857088), (-38.5139624005, 45.8799881572), (-37.0256648489, 42.2869200234))
            Line((-37.0256648489, 42.2869200234), (-36.5175282804, 42.2869200234))
            ThreePointArc((-36.5175282804, 42.2869200234), (-36.5179282804, 44.8274028661), (-36.5179282804, 47.3678857088))
            Line((-36.5179282804, 47.3678857088), (-37.0260648489, 47.8760222774))
            ThreePointArc((-37.0260648489, 47.8760222774), (-39.5665476916, 47.8760222774), (-42.1070305343, 47.8764222774))
            Line((-42.1070305343, 47.8764222774), (-42.1070305343, 47.3682857088))
        make_face()
    extrude(amount=F7_T71_DEPTH)

    split(bisect_by=Plane.XZ.offset(25.3501800656), keep=Keep.TOP)


with BuildPart() as f7_tool65_1:
    add(f7_tool65.part)

    # F7_t73: intersect F7_tool69
    add(f7_tool69.part, mode=Mode.INTERSECT)


with BuildPart() as f1_9:
    add(f1_8.part)

    # F7_t63: cut F7_tool65
    add(f7_tool65_1.part, mode=Mode.SUBTRACT)


with BuildPart() as f7_tool76:
    # F7_s77 → F7_t78 (new body)
    with BuildSketch(Plane.YZ.offset(-37.0260648489)):
        with BuildLine():
            ThreePointArc((-30.4311457511, 47.3682857088), (-26.8380776172, 45.8799881572), (-25.3497800656, 42.2869200234))
            Line((-25.3497800656, 42.2869200234), (-24.8416434971, 42.2869200234))
            ThreePointArc((-24.8416434971, 42.2869200234), (-24.8420434971, 44.8274028661), (-24.8420434971, 47.3678857088))
            Line((-24.8420434971, 47.3678857088), (-25.3501800656, 47.8760222774))
            ThreePointArc((-25.3501800656, 47.8760222774), (-27.8906629083, 47.8760222774), (-30.4311457511, 47.8764222774))
            Line((-30.4311457511, 47.8764222774), (-30.4311457511, 47.3682857088))
        make_face()
    extrude(amount=F7_T78_DEPTH)

    split(bisect_by=Plane.YZ.offset(32.8239351511), keep=Keep.TOP)


with BuildPart() as f7_tool80:
    # F7_s81 → F7_t82 (new body)
    with BuildSketch(Plane.XZ.offset(38.0525943186)):
        with BuildLine():
            ThreePointArc((37.9049008365, 47.3682857088), (34.3118327027, 45.8799881572), (32.8235351511, 42.2869200234))
            Line((32.8235351511, 42.2869200234), (32.3153985826, 42.2869200234))
            ThreePointArc((32.3153985826, 42.2869200234), (32.3157985826, 44.8274028661), (32.3157985826, 47.3678857088))
            Line((32.3157985826, 47.3678857088), (32.8239351511, 47.8760222774))
            ThreePointArc((32.8239351511, 47.8760222774), (35.3644179938, 47.8760222774), (37.9049008365, 47.8764222774))
            Line((37.9049008365, 47.8764222774), (37.9049008365, 47.3682857088))
        make_face()
    extrude(amount=-F7_T82_DEPTH)

    split(bisect_by=Plane.XZ.offset(25.3501800656), keep=Keep.TOP)


with BuildPart() as f7_tool76_1:
    add(f7_tool76.part)

    # F7_t84: intersect F7_tool80
    add(f7_tool80.part, mode=Mode.INTERSECT)


with BuildPart() as f1_10:
    add(f1_9.part)

    # F7_t74: cut F7_tool76
    add(f7_tool76_1.part, mode=Mode.SUBTRACT)


with BuildPart() as f7_tool87:
    # F7_s88 → F7_t89 (new body)
    with BuildSketch(Plane.XZ.offset(25.3501800656)):
        with BuildLine():
            ThreePointArc((37.9049008365, 47.3682857088), (34.3118327027, 45.8799881572), (32.8235351511, 42.2869200234))
            Line((32.8235351511, 42.2869200234), (32.3153985826, 42.2869200234))
            ThreePointArc((32.3153985826, 42.2869200234), (32.3157985826, 44.8274028661), (32.3157985826, 47.3678857088))
            Line((32.3157985826, 47.3678857088), (32.8239351511, 47.8760222774))
            ThreePointArc((32.8239351511, 47.8760222774), (35.3644179938, 47.8760222774), (37.9049008365, 47.8764222774))
            Line((37.9049008365, 47.8764222774), (37.9049008365, 47.3682857088))
        make_face()
    extrude(amount=-F7_T89_DEPTH)

    split(bisect_by=Plane.XZ.offset(19.0001800656), keep=Keep.BOTTOM)


with BuildPart() as f7_tool91:
    # F7_s92 → F7_t93 (new body)
    with BuildSketch(Plane.YZ.offset(45.526349404)):
        with BuildLine():
            ThreePointArc((-13.9192143802, 47.3682857088), (-17.5122825141, 45.8799881572), (-19.0005800656, 42.2869200234))
            Line((-19.0005800656, 42.2869200234), (-19.5087166342, 42.2869200234))
            ThreePointArc((-19.5087166342, 42.2869200234), (-19.5083166342, 44.8274028661), (-19.5083166342, 47.3678857088))
            Line((-19.5083166342, 47.3678857088), (-19.0001800656, 47.8760222774))
            ThreePointArc((-19.0001800656, 47.8760222774), (-16.4596972229, 47.8760222774), (-13.9192143802, 47.8764222774))
            Line((-13.9192143802, 47.8764222774), (-13.9192143802, 47.3682857088))
        make_face()
    extrude(amount=-F7_T93_DEPTH)

    split(bisect_by=Plane.YZ.offset(32.8239351511), keep=Keep.TOP)


with BuildPart() as f7_tool87_1:
    add(f7_tool87.part)

    # F7_t95: intersect F7_tool91
    add(f7_tool91.part, mode=Mode.INTERSECT)


with BuildPart() as f1_11:
    add(f1_10.part)

    # F7_t85: cut F7_tool87
    add(f7_tool87_1.part, mode=Mode.SUBTRACT)


with BuildPart() as f7_tool98:
    # F7_s99 → F7_t100 (new body)
    with BuildSketch(Plane.XZ.offset(6.2977658127)):
        with BuildLine():
            ThreePointArc((-42.1070305343, 47.3682857088), (-38.5139624005, 45.8799881572), (-37.0256648489, 42.2869200234))
            Line((-37.0256648489, 42.2869200234), (-36.5175282804, 42.2869200234))
            ThreePointArc((-36.5175282804, 42.2869200234), (-36.5179282804, 44.8274028661), (-36.5179282804, 47.3678857088))
            Line((-36.5179282804, 47.3678857088), (-37.0260648489, 47.8760222774))
            ThreePointArc((-37.0260648489, 47.8760222774), (-39.5665476916, 47.8760222774), (-42.1070305343, 47.8764222774))
            Line((-42.1070305343, 47.8764222774), (-42.1070305343, 47.3682857088))
        make_face()
    extrude(amount=F7_T100_DEPTH)

    split(bisect_by=Plane.XZ.offset(19.0001800656), keep=Keep.BOTTOM)


with BuildPart() as f7_tool102:
    # F7_s103 → F7_t104 (new body)
    with BuildSketch(Plane.YZ.offset(32.8239351511)):
        with BuildLine():
            ThreePointArc((-13.9192143802, 47.3682857088), (-17.5122825141, 45.8799881572), (-19.0005800656, 42.2869200234))
            Line((-19.0005800656, 42.2869200234), (-19.5087166342, 42.2869200234))
            ThreePointArc((-19.5087166342, 42.2869200234), (-19.5083166342, 44.8274028661), (-19.5083166342, 47.3678857088))
            Line((-19.5083166342, 47.3678857088), (-19.0001800656, 47.8760222774))
            ThreePointArc((-19.0001800656, 47.8760222774), (-16.4596972229, 47.8760222774), (-13.9192143802, 47.8764222774))
            Line((-13.9192143802, 47.8764222774), (-13.9192143802, 47.3682857088))
        make_face()
    extrude(amount=-F7_T104_DEPTH)

    split(bisect_by=Plane.YZ.offset(-37.0260648489), keep=Keep.BOTTOM)


with BuildPart() as f7_tool98_1:
    add(f7_tool98.part)

    # F7_t106: intersect F7_tool102
    add(f7_tool102.part, mode=Mode.INTERSECT)


with BuildPart() as f1_12:
    add(f1_11.part)

    # F7_t96: cut F7_tool98
    add(f7_tool98_1.part, mode=Mode.SUBTRACT)


solid = f1_12.part
